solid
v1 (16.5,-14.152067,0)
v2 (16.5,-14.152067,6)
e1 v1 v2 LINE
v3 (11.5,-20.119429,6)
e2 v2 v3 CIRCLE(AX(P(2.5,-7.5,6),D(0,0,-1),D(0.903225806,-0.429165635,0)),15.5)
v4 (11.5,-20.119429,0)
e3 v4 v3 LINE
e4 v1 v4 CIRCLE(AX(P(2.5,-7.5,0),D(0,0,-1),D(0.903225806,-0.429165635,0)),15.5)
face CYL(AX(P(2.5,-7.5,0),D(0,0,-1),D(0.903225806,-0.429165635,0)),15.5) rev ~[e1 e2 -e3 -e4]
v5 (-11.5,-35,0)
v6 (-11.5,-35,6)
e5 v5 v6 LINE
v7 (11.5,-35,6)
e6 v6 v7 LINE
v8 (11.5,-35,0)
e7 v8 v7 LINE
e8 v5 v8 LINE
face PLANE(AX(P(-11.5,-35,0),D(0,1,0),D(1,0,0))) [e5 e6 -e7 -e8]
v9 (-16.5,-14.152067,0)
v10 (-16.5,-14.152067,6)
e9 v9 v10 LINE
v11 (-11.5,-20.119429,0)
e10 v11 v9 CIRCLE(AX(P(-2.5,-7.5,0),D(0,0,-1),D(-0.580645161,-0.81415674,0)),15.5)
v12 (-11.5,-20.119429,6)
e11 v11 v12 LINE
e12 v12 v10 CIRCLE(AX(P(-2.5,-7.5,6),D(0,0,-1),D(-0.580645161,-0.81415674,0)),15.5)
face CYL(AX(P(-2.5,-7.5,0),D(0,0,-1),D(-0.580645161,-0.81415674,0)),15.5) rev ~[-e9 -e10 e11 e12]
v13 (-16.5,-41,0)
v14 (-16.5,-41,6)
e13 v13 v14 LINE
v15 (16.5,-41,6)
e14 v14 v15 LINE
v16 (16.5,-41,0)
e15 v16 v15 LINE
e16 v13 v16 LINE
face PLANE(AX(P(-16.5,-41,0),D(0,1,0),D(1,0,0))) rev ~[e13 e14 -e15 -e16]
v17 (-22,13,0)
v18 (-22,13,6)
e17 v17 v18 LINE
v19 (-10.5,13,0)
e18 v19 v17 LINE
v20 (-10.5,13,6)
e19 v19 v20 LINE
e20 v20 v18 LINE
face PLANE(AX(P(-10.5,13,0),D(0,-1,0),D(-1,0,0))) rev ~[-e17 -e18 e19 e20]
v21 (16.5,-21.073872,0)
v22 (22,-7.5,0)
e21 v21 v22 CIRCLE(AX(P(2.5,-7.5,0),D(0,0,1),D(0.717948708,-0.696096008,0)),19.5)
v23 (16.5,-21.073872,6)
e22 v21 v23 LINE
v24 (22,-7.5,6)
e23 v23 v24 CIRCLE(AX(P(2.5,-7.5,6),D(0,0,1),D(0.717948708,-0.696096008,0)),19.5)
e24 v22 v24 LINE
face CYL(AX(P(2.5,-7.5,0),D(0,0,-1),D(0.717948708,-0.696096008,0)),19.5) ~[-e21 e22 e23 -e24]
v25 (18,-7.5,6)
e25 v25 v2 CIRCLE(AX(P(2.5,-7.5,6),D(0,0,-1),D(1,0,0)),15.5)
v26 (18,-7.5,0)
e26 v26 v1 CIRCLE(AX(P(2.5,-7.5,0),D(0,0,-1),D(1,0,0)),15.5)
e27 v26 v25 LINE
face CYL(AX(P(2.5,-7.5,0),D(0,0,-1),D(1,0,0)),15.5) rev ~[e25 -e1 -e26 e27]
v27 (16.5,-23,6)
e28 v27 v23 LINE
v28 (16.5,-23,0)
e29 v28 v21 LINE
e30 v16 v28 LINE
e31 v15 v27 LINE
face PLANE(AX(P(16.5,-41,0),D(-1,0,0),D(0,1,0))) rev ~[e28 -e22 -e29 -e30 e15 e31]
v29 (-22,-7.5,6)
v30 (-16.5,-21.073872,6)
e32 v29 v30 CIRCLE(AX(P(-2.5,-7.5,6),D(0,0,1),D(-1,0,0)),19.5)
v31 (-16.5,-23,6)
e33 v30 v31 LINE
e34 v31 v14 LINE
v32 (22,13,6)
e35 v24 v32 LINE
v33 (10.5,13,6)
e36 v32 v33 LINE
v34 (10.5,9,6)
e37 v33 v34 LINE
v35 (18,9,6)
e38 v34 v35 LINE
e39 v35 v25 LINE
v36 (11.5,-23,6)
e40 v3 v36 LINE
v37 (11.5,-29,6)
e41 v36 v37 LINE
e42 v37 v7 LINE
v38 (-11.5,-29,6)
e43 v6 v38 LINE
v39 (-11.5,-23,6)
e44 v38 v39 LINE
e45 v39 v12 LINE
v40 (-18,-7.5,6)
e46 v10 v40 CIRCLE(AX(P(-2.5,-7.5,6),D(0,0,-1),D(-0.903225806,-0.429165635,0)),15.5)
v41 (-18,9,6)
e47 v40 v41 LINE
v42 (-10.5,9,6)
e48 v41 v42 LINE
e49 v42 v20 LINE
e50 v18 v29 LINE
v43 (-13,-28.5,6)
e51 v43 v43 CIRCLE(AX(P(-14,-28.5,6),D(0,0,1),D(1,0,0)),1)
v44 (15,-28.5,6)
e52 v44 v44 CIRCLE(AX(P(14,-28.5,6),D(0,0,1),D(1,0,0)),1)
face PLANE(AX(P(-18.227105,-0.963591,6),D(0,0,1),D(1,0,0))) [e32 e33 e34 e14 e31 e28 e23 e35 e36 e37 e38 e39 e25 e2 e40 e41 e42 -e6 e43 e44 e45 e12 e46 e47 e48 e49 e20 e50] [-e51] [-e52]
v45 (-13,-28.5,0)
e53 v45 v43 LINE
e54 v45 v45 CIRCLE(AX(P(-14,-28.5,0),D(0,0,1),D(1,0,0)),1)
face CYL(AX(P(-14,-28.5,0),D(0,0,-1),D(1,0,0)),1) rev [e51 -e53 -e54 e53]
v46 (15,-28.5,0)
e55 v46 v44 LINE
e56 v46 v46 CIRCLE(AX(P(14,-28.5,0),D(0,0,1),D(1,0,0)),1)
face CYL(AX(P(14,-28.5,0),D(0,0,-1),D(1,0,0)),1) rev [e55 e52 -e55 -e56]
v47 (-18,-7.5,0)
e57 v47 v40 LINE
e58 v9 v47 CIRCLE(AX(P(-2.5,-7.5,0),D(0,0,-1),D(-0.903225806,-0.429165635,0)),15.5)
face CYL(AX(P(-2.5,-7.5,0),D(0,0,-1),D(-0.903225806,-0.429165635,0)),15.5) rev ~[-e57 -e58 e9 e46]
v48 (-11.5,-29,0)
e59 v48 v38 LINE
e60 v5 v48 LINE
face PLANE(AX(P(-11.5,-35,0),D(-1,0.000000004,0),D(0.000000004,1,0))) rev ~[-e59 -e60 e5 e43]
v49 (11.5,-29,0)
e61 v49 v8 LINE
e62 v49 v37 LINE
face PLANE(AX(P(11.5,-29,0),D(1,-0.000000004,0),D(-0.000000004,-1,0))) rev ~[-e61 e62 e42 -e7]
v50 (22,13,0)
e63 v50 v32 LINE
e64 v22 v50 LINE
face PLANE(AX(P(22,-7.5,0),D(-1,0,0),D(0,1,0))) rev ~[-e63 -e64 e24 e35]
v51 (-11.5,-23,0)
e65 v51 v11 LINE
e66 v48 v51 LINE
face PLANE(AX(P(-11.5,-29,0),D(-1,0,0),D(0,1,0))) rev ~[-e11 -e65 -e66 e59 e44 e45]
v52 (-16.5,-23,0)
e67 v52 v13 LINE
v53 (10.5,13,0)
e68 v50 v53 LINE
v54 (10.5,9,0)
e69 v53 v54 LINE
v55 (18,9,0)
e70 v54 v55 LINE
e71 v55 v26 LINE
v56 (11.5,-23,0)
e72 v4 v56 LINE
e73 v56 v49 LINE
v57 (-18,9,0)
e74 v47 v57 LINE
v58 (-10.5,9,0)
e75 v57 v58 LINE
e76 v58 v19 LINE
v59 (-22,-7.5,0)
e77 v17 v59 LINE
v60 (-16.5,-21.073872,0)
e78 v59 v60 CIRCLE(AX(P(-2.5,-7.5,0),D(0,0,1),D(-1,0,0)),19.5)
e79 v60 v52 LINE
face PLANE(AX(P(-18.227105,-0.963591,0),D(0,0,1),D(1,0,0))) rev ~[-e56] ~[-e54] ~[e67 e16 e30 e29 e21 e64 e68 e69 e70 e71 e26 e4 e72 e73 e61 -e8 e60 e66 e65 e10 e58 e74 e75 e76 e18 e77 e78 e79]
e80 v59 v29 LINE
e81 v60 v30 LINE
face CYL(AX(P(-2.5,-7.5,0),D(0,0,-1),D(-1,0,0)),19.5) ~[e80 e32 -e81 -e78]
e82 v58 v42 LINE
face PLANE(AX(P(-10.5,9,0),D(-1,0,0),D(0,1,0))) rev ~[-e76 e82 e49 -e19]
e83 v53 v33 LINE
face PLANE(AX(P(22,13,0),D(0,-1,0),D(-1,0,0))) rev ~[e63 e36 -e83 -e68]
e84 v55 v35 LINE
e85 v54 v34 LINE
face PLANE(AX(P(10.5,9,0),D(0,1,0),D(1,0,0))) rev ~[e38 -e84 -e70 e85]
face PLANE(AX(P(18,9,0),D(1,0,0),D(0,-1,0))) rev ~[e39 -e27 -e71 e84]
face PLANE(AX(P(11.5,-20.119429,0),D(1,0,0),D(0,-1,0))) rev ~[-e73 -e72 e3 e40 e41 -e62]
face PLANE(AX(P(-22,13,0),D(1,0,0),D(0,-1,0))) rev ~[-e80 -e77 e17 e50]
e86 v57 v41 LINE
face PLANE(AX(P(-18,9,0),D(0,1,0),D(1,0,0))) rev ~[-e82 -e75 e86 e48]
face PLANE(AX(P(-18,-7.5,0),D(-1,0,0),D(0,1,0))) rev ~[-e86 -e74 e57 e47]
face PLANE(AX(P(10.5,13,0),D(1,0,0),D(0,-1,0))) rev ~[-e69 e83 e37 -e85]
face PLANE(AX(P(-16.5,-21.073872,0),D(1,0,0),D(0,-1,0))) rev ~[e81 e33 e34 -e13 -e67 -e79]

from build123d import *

# Parameters (mm, degrees)
F0_R     = 1
F0_W     = 23
F0_H     = 6
F1_DEPTH = 6


# Not quite as in the source:
# - a feature names something its author has since deleted; it is built from what else it names


with BuildPart() as f1:
    # F0 (on Top) → F1 (new body)
    with BuildSketch(Plane.XY):
        with BuildLine():
            Line((-16.5, -21.0738723458), (-16.5, -14.1520673478))
            ThreePointArc((-16.5, -14.1520673478), (-17.620350525, -10.9095454242), (-18, -7.5))
            Line((-18, -7.5), (-18, 9))
            Line((-18, 9), (-10.5, 9))
            Line((-10.5, 9), (-10.5, 13.0000002682))
            Line((-10.5, 13.0000002682), (-22.0000002682, 13.0000002682))
            Line((-22.0000002682, 13.0000002682), (-22.0000002682, -7.5))
            ThreePointArc((-22.0000002682, -7.5), (-20.5727697686, -14.8229094869), (-16.5, -21.0738723458))
        make_face()
        with BuildLine():
            Line((14.3321600082, -23), (11.4999999106, -23))
            Line((11.5, -23), (11.5, -24.7988442176))
            ThreePointArc((11.4999999553, -24.7988442176), (12.9548401383, -23.9604473859), (14.3321600082, -23))
        make_face()
        with BuildLine():
            ThreePointArc((14.3321600082, -23), (12.9548401383, -23.9604473859), (11.4999999553, -24.7988442176))
            Line((11.5, -24.7988442176), (11.5, -29))
            Line((11.4999999106, -29), (11.4999999106, -35))
            Line((11.4999999106, -35), (11.4999999106, -41))
            Line((11.4999999106, -41), (16.4999999106, -41))
            Line((16.4999999106, -41), (16.4999999106, -23))
            Line((16.4999999106, -23), (14.3321600082, -23))
        make_face()
        with Locations((14, -28.5)):
            Circle(F0_R, mode=Mode.SUBTRACT)
        with BuildLine():
            ThreePointArc((18, -7.5), (17.620350525, -10.9095454242), (16.5, -14.1520673478))
            Line((16.5, -14.1520673478), (16.5, -21.0738723458))
            ThreePointArc((16.5, -21.0738723458), (20.5727697686, -14.8229094869), (22.0000002682, -7.5))
            Line((22.0000002682, -7.5), (22.0000002682, 13.0000002682))
            Line((22.0000002682, 13.0000002682), (10.5, 13.0000002682))
            Line((10.5, 13.0000002682), (10.5, 9))
            Line((10.5, 9), (18, 9))
            Line((18, 9), (18, -7.5))
        make_face()
        with BuildLine():
            Line((-11.5, -24.7988441711), (-11.5, -23))
            Line((-11.5000000894, -23), (-14.3321600082, -23))
            ThreePointArc((-14.3321600082, -23), (-12.9548401808, -23.9604473589), (-11.5000000447, -24.7988441711))
        make_face()
        with BuildLine():
            Line((-11.5, -29), (-11.5, -24.7988441711))
            ThreePointArc((-11.5000000447, -24.7988441711), (-12.9548401808, -23.9604473589), (-14.3321600082, -23))
            Line((-14.3321600082, -23), (-16.5000000894, -23))
            Line((-16.5000000894, -23), (-16.5000000894, -41))
            Line((-16.5000000894, -41), (-11.5000000894, -41))
            Line((-11.5000000894, -41), (-11.5000000894, -35))
            Line((-11.5000000894, -35), (-11.5000000894, -29))
        make_face()
        with Locations((-14, -28.5)):
            Circle(F0_R, mode=Mode.SUBTRACT)
        with BuildLine():
            Line((-16.5000000894, -23), (-14.3321600082, -23))
            ThreePointArc((-14.3321600082, -23), (-15.4519347824, -22.0772904153), (-16.5, -21.0738723458))
            Line((-16.5, -21.0738723458), (-16.5, -23))
        make_face()
        with Locations((-8.94e-08, -38)):
            Rectangle(F0_W, F0_H)
        with BuildLine():
            ThreePointArc((16.5, -21.0738723458), (15.4519347824, -22.0772904153), (14.3321600082, -23))
            Line((14.3321600082, -23), (16.4999999106, -23))
            Line((16.5, -23), (16.5, -21.0738723458))
        make_face()
        with BuildLine():
            ThreePointArc((16.5, -14.1520673478), (14.3807555592, -17.4547801253), (11.5, -20.1194294641))
            Line((11.5, -20.1194294641), (11.5, -23))
            Line((11.4999999106, -23), (14.3321600082, -23))
            ThreePointArc((14.3321600082, -23), (15.4519347824, -22.0772904153), (16.5, -21.0738723458))
            Line((16.5, -21.0738723458), (16.5, -14.1520673478))
        make_face()
        with BuildLine():
            Line((-11.5, -23), (-11.5, -20.1194294641))
            ThreePointArc((-11.5, -20.1194294641), (-14.3807555592, -17.4547801253), (-16.5, -14.1520673478))
            Line((-16.5, -14.1520673478), (-16.5, -21.0738723458))
            ThreePointArc((-16.5, -21.0738723458), (-15.4519347824, -22.0772904153), (-14.3321600082, -23))
            Line((-14.3321600082, -23), (-11.5000000894, -23))
        make_face()
    extrude(amount=F1_DEPTH)


solid = f1.part
